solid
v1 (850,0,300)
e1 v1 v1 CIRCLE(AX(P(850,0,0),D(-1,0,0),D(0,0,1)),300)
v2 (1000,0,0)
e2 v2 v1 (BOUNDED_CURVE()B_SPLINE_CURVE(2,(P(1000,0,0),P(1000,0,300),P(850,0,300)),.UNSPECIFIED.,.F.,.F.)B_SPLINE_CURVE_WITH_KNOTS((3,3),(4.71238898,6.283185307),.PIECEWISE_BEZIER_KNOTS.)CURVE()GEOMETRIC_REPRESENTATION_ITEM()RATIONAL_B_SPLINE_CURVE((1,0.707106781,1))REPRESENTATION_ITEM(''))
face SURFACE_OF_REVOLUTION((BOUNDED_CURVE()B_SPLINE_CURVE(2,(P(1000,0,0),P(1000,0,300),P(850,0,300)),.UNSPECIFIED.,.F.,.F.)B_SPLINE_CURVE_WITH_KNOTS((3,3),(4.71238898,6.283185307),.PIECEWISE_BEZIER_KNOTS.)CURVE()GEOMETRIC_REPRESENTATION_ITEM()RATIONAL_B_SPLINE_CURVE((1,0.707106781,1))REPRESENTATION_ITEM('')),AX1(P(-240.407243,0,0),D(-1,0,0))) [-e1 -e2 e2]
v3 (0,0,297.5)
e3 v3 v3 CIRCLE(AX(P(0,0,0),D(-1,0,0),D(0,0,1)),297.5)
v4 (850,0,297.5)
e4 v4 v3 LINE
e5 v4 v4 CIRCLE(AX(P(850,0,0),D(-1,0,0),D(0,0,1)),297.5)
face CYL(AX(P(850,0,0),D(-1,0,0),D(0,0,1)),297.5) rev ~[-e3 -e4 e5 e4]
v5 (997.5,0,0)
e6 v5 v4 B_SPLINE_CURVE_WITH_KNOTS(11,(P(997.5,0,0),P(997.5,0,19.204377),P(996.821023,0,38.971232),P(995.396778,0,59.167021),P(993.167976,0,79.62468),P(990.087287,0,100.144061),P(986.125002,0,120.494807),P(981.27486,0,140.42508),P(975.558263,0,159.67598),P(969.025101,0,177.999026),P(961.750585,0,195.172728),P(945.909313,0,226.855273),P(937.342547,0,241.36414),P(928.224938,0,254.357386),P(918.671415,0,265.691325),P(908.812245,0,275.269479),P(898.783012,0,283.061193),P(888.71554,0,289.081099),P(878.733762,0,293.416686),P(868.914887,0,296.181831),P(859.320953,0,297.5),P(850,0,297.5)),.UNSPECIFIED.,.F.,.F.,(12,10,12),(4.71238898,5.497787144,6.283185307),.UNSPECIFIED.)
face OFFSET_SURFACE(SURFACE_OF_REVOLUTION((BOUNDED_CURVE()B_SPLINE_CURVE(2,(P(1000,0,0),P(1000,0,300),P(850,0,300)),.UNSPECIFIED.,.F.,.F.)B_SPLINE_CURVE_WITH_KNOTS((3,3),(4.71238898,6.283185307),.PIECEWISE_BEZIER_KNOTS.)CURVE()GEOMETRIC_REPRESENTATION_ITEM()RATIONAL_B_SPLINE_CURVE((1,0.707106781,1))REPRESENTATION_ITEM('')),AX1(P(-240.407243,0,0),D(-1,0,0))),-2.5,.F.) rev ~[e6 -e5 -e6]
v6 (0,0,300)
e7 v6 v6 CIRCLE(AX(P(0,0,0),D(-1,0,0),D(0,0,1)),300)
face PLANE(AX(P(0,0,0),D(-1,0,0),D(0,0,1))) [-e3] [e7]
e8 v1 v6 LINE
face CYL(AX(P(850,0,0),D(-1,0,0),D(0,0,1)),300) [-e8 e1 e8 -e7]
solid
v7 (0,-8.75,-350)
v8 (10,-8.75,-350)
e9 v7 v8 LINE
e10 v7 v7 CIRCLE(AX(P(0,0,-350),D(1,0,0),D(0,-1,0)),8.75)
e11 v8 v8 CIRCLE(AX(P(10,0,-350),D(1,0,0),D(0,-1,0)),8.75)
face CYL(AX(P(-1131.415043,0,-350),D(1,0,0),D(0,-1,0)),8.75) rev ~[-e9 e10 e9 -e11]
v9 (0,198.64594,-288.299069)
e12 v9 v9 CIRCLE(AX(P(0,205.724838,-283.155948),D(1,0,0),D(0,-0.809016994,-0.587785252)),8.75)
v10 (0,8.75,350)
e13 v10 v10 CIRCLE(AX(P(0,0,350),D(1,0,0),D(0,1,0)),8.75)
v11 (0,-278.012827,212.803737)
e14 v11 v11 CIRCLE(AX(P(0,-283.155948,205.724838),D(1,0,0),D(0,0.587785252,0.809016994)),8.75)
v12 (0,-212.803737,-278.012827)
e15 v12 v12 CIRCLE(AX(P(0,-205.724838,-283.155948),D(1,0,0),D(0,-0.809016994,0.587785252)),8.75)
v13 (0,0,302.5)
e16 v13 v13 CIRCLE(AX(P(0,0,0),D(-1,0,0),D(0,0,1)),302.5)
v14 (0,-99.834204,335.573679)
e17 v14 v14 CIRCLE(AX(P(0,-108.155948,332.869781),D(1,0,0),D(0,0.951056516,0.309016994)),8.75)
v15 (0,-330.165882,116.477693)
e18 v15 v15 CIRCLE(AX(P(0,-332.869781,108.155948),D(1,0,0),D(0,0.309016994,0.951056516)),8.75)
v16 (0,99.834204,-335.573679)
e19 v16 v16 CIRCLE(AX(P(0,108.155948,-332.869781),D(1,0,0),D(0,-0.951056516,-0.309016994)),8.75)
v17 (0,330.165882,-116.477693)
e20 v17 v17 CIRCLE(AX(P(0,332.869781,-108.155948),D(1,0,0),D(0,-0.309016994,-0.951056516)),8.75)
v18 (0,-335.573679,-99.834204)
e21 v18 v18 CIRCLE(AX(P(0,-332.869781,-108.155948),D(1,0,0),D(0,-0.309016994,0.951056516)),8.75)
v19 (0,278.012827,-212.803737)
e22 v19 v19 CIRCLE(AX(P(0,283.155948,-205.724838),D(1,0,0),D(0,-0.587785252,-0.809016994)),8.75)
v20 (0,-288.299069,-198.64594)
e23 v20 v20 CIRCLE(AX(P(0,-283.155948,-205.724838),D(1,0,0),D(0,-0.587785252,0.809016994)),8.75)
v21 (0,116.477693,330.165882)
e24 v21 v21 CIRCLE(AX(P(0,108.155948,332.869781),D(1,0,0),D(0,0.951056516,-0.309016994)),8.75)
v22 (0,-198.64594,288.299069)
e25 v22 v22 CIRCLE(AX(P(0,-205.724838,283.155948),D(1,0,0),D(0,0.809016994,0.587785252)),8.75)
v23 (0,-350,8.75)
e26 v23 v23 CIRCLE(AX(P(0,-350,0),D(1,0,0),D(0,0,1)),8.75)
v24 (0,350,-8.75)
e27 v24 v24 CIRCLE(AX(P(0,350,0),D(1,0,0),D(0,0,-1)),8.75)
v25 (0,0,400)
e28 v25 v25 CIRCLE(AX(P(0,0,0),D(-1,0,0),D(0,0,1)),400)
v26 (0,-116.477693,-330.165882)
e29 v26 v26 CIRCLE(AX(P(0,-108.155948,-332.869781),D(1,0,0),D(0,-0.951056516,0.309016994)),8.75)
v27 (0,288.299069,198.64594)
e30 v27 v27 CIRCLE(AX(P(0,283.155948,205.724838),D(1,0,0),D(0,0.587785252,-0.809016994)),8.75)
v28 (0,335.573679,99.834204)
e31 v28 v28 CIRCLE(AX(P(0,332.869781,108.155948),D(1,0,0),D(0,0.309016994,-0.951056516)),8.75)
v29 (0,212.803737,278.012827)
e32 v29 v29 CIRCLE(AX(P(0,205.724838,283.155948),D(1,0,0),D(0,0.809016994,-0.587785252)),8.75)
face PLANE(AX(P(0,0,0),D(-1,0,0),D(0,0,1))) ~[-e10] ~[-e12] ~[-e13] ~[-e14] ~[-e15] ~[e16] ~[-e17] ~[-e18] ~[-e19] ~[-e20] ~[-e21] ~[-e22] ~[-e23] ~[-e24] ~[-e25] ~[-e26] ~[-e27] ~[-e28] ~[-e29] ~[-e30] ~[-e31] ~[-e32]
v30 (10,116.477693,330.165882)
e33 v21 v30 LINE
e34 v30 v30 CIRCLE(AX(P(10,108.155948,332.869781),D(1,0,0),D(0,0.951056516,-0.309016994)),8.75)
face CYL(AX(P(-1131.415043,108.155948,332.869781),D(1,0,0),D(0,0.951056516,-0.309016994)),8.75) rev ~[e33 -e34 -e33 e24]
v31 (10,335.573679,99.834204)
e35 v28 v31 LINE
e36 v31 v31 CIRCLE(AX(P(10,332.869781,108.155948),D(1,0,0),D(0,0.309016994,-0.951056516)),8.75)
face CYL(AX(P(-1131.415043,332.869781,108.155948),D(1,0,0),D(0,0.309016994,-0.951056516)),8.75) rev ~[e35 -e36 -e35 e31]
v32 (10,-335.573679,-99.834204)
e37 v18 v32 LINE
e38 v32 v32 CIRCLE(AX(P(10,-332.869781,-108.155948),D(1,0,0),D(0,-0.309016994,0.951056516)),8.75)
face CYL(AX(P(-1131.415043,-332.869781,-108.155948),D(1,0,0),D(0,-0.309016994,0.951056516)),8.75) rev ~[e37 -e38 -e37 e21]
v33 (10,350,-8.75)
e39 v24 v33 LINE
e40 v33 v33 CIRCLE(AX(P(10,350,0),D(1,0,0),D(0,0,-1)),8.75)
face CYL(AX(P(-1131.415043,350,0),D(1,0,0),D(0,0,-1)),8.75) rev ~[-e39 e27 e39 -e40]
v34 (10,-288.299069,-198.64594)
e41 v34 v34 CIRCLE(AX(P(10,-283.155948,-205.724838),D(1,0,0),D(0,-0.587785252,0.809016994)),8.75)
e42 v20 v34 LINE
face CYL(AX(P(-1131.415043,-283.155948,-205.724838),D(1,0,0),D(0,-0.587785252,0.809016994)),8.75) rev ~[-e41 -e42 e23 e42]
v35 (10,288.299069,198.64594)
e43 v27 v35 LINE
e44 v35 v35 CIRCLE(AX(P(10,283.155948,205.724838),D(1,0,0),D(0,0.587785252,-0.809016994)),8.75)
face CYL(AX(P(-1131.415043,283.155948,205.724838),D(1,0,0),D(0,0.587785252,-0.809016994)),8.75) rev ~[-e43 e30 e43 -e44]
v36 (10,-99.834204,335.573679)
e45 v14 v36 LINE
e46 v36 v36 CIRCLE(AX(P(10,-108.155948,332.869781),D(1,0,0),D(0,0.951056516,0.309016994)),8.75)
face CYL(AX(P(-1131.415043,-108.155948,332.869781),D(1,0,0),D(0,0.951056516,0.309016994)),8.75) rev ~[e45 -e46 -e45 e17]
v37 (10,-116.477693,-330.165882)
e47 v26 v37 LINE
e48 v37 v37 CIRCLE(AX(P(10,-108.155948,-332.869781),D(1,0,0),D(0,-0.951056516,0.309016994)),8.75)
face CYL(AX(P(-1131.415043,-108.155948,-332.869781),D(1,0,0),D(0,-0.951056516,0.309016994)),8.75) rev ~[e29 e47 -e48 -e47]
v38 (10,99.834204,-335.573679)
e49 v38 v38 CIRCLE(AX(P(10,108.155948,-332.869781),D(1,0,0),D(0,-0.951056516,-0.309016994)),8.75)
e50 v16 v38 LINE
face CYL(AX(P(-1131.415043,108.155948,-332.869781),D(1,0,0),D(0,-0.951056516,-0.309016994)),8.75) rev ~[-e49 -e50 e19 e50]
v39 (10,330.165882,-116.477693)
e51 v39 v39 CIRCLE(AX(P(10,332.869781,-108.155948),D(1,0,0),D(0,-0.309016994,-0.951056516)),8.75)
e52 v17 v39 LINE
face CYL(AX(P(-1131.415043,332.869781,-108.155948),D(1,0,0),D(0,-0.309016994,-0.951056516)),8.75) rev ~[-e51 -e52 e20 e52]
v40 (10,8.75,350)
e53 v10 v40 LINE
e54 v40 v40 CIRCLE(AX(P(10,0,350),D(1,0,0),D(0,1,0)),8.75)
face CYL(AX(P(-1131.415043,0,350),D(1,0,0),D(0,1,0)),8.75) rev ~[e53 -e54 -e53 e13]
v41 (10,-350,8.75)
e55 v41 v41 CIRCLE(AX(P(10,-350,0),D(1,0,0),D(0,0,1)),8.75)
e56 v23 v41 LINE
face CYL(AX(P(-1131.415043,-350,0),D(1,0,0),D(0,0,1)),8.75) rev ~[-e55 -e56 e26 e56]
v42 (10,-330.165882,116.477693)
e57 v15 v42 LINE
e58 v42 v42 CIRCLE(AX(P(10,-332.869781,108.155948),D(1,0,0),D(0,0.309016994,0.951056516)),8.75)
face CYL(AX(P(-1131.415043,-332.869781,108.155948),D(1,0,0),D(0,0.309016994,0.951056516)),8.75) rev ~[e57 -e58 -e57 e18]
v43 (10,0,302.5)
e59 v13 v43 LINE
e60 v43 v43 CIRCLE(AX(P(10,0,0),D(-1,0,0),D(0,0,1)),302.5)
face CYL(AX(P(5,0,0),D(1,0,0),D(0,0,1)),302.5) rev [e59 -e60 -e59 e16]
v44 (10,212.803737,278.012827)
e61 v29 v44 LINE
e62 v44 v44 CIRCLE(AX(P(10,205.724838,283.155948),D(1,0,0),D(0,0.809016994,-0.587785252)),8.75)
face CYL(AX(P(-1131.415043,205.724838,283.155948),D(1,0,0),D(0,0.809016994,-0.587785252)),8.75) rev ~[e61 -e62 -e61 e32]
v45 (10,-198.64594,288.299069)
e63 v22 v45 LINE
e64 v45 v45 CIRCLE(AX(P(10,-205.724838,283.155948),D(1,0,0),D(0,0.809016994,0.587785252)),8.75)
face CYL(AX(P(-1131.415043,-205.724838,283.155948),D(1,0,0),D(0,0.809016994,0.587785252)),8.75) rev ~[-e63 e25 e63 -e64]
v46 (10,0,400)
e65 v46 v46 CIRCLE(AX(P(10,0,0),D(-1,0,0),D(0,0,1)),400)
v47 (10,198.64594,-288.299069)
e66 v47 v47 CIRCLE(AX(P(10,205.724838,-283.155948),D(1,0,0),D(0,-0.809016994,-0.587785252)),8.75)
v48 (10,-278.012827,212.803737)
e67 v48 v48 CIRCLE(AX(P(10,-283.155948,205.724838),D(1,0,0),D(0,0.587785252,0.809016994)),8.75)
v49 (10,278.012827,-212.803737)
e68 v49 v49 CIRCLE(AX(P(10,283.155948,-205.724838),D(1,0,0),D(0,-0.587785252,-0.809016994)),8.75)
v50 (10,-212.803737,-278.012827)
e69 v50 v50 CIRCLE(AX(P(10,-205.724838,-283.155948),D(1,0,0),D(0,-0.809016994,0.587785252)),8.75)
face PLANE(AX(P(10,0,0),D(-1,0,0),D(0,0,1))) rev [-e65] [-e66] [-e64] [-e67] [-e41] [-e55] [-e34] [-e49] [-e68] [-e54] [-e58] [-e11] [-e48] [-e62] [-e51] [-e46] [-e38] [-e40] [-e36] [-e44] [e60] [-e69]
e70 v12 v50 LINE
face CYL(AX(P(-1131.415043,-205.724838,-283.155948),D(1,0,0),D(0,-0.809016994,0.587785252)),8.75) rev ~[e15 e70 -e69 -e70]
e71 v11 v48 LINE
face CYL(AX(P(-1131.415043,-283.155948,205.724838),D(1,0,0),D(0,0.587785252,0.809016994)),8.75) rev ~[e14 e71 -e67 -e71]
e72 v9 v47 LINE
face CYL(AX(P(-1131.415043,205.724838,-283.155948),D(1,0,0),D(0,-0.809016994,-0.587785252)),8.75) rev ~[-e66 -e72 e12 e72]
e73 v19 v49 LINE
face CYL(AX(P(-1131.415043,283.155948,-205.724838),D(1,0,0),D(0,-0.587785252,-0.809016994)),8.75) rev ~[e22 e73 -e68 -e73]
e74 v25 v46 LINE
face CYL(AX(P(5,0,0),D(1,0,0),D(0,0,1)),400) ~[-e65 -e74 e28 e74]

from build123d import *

# Parameters (mm, degrees)
F2_T            = -2.5
F3_W            = 10
F3_H            = 97.5
F6_D            = 17.5
F6_COPIES_COUNT = 20


# Not quite as in the source:
# - a pattern or mirror of a feature is missing from the dataset's text; its kind, count and spacing are read off the source's solid


with BuildPart() as f1:
    # F0 (on Front) → F1 (revolve)
    with BuildSketch(Plane.XZ):
        with BuildLine():
            Line((0, 300), (0, 0))
            Line((0, 0), (1000, 0))
            add(Edge.make_bspline(
                [(1000, 0), (1000, 300), (850, 300)],
                knots=[4.7123889804, 4.7123889804, 4.7123889804, 6.2831853072, 6.2831853072, 6.2831853072], degree=2, weights=[1, 0.7071067812, 1]))
            Line((850, 300), (0, 300))
        make_face()
    revolve(axis=Axis((-240.407243371, 0, 0), (-1, 0, 0)))

    # F2
    f2_openings = [f1.faces().sort_by_distance(p)[0] for p in [
        (0, 0, 0),
    ]]
    offset(amount=F2_T, openings=f2_openings)


with BuildPart() as f4:
    # F3 (on Front) → F4 (revolve)
    with BuildSketch(Plane.XZ):
        with Locations((5, 351.25)):
            Rectangle(F3_W, F3_H)
    revolve(axis=Axis((-40.1947914194, 0, 0), (-1, 0, 0)))

    # F6 (through all)
    with Locations(Plane(origin=(0, 0, 0), x_dir=(0, -1, 0), z_dir=(-1, 0, 0))):
        with Locations((0, 350)):
            f6 = Hole(F6_D / 2)

    # F6_copies: F6 ×20 about axis
    f6_copies_axis = Axis((0, 0, 0), (1, 0, 0))
    for i in range(1, F6_COPIES_COUNT):
        add(f6.rotate(f6_copies_axis, i * 360 / F6_COPIES_COUNT), mode=Mode.SUBTRACT)


solid = Compound([f1.part, f4.part])
